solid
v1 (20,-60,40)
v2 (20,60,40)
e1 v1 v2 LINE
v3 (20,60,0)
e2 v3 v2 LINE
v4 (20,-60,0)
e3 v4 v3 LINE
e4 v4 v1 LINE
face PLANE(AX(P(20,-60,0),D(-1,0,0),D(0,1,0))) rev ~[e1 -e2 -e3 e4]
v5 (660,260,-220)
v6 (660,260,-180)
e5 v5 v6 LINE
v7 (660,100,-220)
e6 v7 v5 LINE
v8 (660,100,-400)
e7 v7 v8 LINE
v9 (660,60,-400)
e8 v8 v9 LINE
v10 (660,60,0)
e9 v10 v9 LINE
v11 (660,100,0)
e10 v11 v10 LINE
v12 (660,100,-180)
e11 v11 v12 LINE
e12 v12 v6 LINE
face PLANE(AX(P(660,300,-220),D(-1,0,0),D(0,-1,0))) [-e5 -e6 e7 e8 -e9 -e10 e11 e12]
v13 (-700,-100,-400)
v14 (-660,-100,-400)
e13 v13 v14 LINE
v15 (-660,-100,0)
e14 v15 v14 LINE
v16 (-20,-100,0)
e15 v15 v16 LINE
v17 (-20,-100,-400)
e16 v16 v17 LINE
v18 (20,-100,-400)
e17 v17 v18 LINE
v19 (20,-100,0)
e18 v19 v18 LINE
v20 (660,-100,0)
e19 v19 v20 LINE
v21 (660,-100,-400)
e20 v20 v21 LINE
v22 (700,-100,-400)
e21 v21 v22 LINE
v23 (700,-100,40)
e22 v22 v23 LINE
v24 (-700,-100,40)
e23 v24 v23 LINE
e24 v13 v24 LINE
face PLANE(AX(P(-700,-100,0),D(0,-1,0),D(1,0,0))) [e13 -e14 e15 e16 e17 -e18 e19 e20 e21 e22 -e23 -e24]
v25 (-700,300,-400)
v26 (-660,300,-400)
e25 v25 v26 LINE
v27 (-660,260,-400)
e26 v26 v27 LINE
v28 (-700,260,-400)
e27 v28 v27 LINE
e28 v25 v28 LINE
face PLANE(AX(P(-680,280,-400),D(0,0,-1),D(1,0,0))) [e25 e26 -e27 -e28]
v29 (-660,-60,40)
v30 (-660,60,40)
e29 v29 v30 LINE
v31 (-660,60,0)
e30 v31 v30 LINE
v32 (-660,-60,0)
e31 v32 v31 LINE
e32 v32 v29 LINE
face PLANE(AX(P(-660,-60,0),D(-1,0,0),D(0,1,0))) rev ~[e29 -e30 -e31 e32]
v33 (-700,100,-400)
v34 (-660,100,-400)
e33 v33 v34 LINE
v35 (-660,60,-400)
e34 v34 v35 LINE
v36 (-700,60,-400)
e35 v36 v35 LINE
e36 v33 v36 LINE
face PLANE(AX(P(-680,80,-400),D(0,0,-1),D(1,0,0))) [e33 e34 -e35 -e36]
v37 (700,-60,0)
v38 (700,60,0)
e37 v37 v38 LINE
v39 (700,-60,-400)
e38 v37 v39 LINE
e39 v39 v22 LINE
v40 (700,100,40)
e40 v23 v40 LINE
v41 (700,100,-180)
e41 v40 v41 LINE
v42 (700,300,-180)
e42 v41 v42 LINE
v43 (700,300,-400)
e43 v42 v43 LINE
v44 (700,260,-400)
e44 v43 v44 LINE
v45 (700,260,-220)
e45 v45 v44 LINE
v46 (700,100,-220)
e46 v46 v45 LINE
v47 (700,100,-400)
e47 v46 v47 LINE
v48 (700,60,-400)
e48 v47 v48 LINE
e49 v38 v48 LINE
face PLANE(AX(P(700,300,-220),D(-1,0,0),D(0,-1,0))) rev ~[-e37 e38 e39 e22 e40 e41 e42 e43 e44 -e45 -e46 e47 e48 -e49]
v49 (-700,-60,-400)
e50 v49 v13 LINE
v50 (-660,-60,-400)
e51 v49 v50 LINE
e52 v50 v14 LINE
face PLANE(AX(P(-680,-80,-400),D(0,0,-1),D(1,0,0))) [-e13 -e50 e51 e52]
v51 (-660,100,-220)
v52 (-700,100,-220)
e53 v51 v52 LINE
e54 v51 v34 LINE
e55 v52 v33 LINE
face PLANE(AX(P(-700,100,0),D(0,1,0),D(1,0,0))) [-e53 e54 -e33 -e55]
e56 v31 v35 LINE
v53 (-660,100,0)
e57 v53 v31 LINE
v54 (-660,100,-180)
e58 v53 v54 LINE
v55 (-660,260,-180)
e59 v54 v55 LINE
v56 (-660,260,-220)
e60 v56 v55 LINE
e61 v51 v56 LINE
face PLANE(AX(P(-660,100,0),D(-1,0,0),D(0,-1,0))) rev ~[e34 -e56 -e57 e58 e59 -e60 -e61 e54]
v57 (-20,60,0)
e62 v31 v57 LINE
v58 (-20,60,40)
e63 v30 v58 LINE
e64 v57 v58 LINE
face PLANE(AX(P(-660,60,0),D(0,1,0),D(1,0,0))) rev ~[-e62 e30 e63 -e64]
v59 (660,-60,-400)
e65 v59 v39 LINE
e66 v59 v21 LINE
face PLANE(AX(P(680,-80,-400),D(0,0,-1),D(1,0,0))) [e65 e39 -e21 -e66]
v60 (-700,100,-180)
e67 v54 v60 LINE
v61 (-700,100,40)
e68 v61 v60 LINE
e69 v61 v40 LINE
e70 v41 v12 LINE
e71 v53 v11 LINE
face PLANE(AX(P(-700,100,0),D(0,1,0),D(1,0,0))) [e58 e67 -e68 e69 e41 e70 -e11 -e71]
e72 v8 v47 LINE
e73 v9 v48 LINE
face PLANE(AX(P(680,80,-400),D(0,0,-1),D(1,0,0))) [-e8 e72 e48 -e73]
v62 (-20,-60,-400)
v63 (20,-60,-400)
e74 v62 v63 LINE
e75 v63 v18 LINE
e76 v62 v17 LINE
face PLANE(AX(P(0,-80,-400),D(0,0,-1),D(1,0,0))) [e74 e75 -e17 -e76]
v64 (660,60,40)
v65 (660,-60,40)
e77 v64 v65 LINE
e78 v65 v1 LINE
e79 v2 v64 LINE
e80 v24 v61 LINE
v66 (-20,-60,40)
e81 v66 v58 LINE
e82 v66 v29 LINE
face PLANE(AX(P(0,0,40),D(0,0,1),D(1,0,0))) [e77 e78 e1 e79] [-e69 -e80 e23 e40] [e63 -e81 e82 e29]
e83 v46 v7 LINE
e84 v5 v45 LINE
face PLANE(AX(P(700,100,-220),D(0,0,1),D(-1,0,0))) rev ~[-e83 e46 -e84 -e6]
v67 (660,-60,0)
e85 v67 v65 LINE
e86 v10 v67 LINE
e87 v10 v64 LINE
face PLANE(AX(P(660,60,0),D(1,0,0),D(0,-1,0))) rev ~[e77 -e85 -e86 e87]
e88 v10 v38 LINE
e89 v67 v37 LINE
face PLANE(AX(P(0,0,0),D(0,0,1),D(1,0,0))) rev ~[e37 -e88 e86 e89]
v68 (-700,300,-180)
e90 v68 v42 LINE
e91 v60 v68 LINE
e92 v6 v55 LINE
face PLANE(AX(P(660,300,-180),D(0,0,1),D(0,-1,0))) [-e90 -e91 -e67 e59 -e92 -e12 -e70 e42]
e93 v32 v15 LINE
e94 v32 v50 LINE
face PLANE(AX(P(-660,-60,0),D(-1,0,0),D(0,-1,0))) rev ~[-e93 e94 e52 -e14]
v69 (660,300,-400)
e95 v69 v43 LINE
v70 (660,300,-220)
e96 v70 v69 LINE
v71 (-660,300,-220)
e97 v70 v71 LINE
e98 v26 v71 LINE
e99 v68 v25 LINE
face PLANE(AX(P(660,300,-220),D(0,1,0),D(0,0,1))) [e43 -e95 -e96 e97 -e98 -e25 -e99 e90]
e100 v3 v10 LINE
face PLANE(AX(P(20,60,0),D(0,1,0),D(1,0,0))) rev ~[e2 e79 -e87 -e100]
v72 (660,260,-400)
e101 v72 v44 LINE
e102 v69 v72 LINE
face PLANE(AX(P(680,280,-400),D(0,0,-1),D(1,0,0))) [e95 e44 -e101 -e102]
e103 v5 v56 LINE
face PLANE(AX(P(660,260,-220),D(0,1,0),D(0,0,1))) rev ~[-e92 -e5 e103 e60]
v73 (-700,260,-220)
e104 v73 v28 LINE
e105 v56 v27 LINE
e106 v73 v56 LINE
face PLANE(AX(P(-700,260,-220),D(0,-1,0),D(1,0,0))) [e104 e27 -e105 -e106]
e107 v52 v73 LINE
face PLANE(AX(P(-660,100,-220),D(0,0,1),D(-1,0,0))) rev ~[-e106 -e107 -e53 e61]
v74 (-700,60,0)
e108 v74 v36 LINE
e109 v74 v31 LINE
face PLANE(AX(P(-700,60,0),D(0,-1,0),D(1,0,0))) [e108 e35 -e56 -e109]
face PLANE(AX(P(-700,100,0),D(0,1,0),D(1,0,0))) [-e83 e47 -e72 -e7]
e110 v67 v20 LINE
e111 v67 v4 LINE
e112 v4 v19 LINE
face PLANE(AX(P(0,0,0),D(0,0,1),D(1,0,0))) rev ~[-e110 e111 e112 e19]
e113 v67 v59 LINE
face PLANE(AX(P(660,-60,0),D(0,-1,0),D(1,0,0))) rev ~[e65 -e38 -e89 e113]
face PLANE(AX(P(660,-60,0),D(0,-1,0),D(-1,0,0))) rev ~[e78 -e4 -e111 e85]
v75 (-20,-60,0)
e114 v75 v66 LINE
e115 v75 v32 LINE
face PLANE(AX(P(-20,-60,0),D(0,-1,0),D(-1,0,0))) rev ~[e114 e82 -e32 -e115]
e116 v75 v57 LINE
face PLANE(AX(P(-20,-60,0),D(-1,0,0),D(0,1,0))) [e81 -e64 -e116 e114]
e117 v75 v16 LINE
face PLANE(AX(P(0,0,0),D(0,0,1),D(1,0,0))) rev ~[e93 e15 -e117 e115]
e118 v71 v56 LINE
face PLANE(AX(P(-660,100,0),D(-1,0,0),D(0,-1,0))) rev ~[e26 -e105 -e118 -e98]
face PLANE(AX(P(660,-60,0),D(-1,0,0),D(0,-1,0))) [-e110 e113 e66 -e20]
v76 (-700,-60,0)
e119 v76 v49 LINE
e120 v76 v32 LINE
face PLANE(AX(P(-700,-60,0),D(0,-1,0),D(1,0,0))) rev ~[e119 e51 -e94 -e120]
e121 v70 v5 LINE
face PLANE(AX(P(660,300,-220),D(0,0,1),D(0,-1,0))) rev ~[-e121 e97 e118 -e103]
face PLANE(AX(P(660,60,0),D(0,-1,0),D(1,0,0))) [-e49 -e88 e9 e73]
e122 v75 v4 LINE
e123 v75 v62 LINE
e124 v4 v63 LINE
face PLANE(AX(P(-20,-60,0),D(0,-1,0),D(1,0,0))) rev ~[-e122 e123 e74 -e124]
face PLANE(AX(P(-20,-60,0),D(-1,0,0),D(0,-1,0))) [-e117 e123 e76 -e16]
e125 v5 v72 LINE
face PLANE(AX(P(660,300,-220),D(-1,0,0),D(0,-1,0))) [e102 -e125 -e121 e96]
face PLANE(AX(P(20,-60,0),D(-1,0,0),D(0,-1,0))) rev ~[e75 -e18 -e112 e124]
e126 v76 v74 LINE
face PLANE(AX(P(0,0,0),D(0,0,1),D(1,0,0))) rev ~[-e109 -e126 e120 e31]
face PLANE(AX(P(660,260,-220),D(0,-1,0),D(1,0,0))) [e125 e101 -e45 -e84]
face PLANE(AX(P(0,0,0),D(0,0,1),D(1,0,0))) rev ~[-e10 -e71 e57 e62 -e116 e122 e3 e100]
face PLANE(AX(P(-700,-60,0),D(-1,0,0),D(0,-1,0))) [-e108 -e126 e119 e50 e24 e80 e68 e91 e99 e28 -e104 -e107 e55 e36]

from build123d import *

# Parameters (mm, degrees)
F0_W      = 1400
F0_H      = 200
F0_W_2    = 40
F0_H_2    = 120
F1_DEPTH  = 40
F2_W      = 40
F2_H      = 40
F3_DEPTH  = 400
F4_W      = 40
F4_H      = 40
F5_DEPTH  = 200
F7_W      = 40
F7_H      = 40
F6_W      = 40
F6_H      = 40
F8_DEPTH  = 180
F9_W      = 40
F9_H      = 40
F10_DEPTH = 1320


# Not quite as in the source:
# - a feature names something its author has since deleted; it is built from what else it names


with BuildPart() as f1:
    # F0 (on Top) → F1 (new body)
    with BuildSketch(Plane.XY):
        Rectangle(F0_W, F0_H)
        Polygon((20, 60), (660, 60), (660, -60), (20, -60), (-20, -60), (-660, -60), (-660, 60), (-20, 60), align=None, mode=Mode.SUBTRACT)
        Rectangle(F0_W_2, F0_H_2)
    extrude(amount=F1_DEPTH)

    # F2 (on face) → F3 (join)
    with BuildSketch(Plane(origin=(0, 0, 0), x_dir=(1, 0, 0), z_dir=(0, 0, -1))):
        with Locations((-680, 80)):
            Rectangle(F2_W, F2_H)
        with Locations((-680, -80)):
            Rectangle(F2_W, F2_H)
        with Locations((680, 80)):
            Rectangle(F2_W, F2_H)
        with Locations((680, -80)):
            Rectangle(F2_W, F2_H)
        with Locations((0, 80)):
            Rectangle(F2_W, F2_H)
    extrude(amount=F3_DEPTH)

    # F4 (on face) → F5 (join)
    with BuildSketch(Plane(origin=(0, 100, 0), x_dir=(-1, 0, 0), z_dir=(0, 1, 0))):
        with Locations((-680, -200)):
            Rectangle(F4_W, F4_H)
        with Locations((680, -200)):
            Rectangle(F4_W, F4_H)
    extrude(amount=F5_DEPTH)

    # F7 (on face) + F6 (on face) → F8 (join)
    with BuildSketch(Plane(origin=(0, 0, -220), x_dir=(1, 0, 0), z_dir=(0, 0, -1))):
        with Locations((680, -280)):
            Rectangle(F7_W, F7_H)
    with BuildSketch(Plane(origin=(0, 0, -220), x_dir=(1, 0, 0), z_dir=(0, 0, -1))):
        with Locations((-680, -280)):
            Rectangle(F6_W, F6_H)
    extrude(amount=F8_DEPTH)

    # F9 (on face) → F10 (join, through all)
    with BuildSketch(Plane(origin=(660, 0, 0), x_dir=(0, -1, 0), z_dir=(-1, 0, 0))):
        with Locations((-280, -200)):
            Rectangle(F9_W, F9_H)
    extrude(amount=F10_DEPTH)


solid = f1.part
